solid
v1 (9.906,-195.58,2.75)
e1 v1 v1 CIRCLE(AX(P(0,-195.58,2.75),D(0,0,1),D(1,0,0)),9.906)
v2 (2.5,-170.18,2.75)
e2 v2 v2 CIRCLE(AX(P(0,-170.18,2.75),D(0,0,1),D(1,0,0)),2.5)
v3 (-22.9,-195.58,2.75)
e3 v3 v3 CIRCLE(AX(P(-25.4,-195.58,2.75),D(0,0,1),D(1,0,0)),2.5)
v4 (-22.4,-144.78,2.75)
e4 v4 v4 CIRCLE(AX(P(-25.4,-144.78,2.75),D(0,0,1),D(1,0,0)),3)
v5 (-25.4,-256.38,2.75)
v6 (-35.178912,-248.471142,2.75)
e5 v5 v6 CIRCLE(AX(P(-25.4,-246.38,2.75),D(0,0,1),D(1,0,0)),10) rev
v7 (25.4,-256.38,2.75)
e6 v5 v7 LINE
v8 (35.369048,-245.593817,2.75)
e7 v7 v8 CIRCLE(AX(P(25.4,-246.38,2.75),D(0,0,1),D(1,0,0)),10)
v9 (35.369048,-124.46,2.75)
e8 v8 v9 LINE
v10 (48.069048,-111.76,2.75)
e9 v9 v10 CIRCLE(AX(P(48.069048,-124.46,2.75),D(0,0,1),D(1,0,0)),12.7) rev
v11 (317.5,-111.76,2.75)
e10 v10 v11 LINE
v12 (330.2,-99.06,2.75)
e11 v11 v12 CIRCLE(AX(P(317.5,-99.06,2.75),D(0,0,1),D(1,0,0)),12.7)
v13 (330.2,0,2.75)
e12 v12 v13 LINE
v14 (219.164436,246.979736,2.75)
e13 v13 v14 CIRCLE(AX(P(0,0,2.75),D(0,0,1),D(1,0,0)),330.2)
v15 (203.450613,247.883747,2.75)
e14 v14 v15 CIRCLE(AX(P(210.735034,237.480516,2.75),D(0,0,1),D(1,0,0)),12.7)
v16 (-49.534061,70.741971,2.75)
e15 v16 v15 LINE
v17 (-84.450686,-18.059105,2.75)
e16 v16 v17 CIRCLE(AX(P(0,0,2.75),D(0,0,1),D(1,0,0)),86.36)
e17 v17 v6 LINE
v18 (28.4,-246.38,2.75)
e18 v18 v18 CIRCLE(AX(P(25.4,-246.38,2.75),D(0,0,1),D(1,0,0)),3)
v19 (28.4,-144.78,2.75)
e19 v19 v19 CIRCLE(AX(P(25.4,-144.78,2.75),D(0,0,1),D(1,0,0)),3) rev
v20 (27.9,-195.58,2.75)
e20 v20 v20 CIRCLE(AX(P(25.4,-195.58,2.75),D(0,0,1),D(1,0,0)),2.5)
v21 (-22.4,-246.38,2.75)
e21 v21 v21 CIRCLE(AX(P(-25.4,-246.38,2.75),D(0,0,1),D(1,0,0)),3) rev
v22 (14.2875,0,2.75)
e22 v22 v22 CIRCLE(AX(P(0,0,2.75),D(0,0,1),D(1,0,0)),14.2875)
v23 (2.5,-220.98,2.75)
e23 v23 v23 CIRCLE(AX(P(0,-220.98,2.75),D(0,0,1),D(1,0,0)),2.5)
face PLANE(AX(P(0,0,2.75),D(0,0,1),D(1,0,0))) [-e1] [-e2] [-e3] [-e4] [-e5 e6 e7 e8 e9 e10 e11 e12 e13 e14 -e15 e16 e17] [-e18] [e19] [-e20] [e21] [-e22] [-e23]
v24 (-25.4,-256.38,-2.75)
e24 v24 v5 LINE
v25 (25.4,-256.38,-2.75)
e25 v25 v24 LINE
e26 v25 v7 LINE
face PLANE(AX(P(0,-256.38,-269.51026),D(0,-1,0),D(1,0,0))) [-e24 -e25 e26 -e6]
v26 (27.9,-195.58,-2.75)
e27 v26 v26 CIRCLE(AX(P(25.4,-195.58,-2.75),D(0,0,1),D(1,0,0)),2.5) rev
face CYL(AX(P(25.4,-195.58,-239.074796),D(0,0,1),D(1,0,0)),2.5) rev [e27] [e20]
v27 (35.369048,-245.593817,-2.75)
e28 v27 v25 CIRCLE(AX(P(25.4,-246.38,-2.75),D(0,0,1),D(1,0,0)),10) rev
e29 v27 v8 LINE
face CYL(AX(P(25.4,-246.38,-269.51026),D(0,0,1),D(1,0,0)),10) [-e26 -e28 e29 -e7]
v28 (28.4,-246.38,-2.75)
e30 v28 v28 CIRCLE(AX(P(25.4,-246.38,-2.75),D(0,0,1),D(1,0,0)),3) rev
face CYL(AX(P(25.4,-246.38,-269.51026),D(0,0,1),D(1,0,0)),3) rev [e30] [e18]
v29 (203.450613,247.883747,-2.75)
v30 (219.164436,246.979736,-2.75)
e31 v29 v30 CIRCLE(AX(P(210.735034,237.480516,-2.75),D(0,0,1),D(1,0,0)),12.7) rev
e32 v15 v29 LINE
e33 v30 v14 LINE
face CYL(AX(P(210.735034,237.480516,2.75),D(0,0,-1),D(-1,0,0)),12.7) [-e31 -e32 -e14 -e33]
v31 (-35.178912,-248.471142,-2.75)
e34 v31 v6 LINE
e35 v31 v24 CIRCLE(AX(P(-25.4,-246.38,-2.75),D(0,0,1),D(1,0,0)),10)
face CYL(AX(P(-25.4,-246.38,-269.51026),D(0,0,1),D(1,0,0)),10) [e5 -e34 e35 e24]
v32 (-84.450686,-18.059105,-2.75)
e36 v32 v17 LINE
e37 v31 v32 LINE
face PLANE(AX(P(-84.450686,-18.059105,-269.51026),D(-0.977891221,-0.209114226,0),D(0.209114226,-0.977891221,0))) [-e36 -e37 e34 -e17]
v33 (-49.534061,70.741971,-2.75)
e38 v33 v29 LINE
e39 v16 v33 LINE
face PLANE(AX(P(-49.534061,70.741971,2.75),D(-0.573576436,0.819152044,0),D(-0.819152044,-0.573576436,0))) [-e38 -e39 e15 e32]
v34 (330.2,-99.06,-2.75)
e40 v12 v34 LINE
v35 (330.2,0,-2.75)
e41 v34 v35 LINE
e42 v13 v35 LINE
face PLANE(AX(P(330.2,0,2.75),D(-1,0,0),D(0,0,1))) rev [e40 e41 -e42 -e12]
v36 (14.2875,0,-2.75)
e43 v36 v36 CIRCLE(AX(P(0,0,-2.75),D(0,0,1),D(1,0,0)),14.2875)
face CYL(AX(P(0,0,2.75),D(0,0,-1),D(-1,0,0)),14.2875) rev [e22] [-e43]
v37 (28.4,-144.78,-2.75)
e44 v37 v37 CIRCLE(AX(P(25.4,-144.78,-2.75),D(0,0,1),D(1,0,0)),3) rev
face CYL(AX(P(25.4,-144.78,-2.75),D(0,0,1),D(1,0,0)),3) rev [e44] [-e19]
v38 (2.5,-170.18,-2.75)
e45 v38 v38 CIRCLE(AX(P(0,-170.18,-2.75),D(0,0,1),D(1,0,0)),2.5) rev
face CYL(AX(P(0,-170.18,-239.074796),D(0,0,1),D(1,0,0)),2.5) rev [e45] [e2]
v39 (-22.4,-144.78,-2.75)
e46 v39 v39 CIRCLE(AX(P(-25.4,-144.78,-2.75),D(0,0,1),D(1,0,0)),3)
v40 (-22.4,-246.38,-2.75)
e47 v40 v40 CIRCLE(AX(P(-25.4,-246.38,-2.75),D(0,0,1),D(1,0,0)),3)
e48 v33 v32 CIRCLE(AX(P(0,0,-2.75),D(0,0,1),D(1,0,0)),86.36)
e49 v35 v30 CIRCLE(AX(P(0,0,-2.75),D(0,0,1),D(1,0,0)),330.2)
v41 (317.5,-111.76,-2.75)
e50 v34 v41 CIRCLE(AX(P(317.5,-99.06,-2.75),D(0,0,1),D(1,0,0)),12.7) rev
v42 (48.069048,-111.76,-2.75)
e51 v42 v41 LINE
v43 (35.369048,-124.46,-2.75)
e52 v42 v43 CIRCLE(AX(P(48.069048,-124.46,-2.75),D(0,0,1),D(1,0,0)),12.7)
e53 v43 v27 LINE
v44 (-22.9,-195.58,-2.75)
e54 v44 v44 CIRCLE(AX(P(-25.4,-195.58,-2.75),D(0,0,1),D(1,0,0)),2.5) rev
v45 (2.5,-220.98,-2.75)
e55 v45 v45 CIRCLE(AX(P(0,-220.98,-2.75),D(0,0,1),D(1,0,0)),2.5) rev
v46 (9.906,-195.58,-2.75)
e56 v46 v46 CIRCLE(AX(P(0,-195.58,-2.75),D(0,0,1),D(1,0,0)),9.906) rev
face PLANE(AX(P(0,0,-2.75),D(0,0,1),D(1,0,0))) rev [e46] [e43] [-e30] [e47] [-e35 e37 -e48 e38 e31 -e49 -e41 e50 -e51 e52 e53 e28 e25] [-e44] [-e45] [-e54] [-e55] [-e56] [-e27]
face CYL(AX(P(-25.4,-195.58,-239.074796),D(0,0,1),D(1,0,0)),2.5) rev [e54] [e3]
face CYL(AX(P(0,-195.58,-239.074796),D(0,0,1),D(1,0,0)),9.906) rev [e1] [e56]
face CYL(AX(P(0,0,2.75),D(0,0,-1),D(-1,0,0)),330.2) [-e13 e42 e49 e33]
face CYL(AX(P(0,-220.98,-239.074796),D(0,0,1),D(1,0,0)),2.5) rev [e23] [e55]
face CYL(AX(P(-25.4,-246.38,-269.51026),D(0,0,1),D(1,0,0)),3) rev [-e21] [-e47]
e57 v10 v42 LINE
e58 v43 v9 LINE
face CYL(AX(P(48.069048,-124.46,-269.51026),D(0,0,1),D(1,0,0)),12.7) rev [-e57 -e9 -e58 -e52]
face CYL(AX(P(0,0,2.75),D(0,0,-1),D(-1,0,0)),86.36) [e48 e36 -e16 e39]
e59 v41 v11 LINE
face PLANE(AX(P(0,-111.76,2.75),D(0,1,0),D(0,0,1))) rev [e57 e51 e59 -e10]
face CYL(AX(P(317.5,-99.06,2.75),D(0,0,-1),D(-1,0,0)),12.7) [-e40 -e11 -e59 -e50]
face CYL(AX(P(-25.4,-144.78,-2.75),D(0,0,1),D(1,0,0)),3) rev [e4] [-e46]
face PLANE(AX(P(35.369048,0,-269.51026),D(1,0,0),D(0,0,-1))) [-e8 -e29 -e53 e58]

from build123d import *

# Parameters (mm, degrees)
SKETCH1_R               = 86.36
SKETCH1_R_2             = 14.2875
BOSS_EXTRUDE1_DEPTH     = 2.75
SKETCH2_R               = 33.4
SKETCH2_R_2             = 9.906
SKETCH2_R_3             = 2.5
BOSS_EXTRUDE2_DEPTH     = 5.5
FILLET2_R               = 12.7
SKETCH4_R               = 3
BOSS_EXTRUDE3_DEPTH     = 5.5
CUT_EXTRUDE1_DEPTH      = 419.082521041
CUT_EXTRUDE1_DEPTH_BACK = 419.082521041
SKETCH4_3_R             = 3
FILLET3_R               = 12.7


with BuildPart() as part:
    # Sketch1 → Boss-Extrude1 (new, symmetric)
    # profile 1 of 3: a face of its own
    with BuildSketch(Plane.XY):
        Circle(SKETCH1_R)
        Circle(SKETCH1_R_2, mode=Mode.SUBTRACT)
    # profile 2 of 3: a face of its own
    with BuildSketch(Plane.XY):
        with BuildLine():
            Line((0, -86.36), (0, -111.76))
            Line((0, -111.76), (310.711670846, -111.76))
            ThreePointArc((310.711670846, -111.76), (325.291433728, -56.723215206), (330.2, 0))
            ThreePointArc((330.2, 0), (299.066021409, 139.96983546), (211.535222055, 253.544650565))
            Line((211.535222055, 253.544650565), (-49.534061043, 70.741970545))
            ThreePointArc((-49.534061043, 70.741970545), (39.876610239, 76.602255553), (86.36, 0))
            ThreePointArc((86.36, 0), (61.065741623, -61.065741623), (0, -86.36))
        make_face()
    # profile 3 of 3: a face of its own
    with BuildSketch(Plane.XY):
        with BuildLine():
            ThreePointArc((330.2, 0), (325.291433728, -56.723215206), (310.711670846, -111.76))
            Line((310.711670846, -111.76), (330.2, -111.76))
            Line((330.2, -111.76), (330.2, 0))
        make_face()
    extrude(amount=BOSS_EXTRUDE1_DEPTH, both=True)

    # Sketch2 → Boss-Extrude2 (add)
    # profile 1 of 2: a face of its own
    with BuildSketch(Plane.XY.offset(2.75)):
        with BuildLine():
            ThreePointArc((-32.152177301, -204.624196748), (-4.564935824, -162.493426274), (33.4, -195.58))
            Line((33.4, -195.58), (33.4, -111.76))
            Line((33.4, -111.76), (0, -111.76))
            Line((0, -111.76), (0, -86.36))
            ThreePointArc((0, -86.36), (-52.146556012, -68.838842931), (-83.133593763, -23.384935065))
            Line((-83.133593763, -23.384935065), (-32.152177301, -204.624196748))
        make_face()
    # profile 2 of 2: a face of its own
    with BuildSketch(Plane.XY.offset(2.75)):
        with Locations((0, -195.58)):
            Circle(SKETCH2_R)
        with Locations((0, -195.58)):
            Circle(SKETCH2_R_2, mode=Mode.SUBTRACT)
        with Locations((0, -170.18)):
            Circle(SKETCH2_R_3, mode=Mode.SUBTRACT)
        with Locations((25.4, -195.58)):
            Circle(SKETCH2_R_3, mode=Mode.SUBTRACT)
        with Locations((0, -220.98)):
            Circle(SKETCH2_R_3, mode=Mode.SUBTRACT)
        with Locations((-25.4, -195.58)):
            Circle(SKETCH2_R_3, mode=Mode.SUBTRACT)
    extrude(amount=-BOSS_EXTRUDE2_DEPTH)

    # Fillet2
    fillet2_edges = [part.edges().sort_by_distance(p)[0] for p in [
        (211.535222055, 253.544650565, 0),
        (330.2, -111.76, 0),
        (33.4, -111.76, 0),
    ]]
    fillet(fillet2_edges, radius=FILLET2_R)

    # Sketch4 → Boss-Extrude3 (add)
    with BuildSketch(Plane.XY.offset(2.75)):
        with BuildLine():
            ThreePointArc((-83.133593763, -23.384935065), (-83.834442875, -20.732481468), (-84.450685864, -18.05910455))
            Line((-84.450685864, -18.05910455), (-35.178912212, -248.471142259))
            ThreePointArc((-35.178912212, -248.471142259), (-31.688424978, -254.155327086), (-25.4, -256.38))
            Line((-25.4, -256.38), (25.4, -256.38))
            ThreePointArc((25.4, -256.38), (32.743767081, -253.16742109), (35.369047914, -245.593817011))
            Line((35.369047914, -245.593817011), (35.369047914, -117.66760224))
            ThreePointArc((35.369047914, -117.66760224), (33.902190945, -120.923977623), (33.4, -124.46))
            Line((33.4, -124.46), (33.4, -195.58))
            ThreePointArc((33.4, -195.58), (4.564935824, -228.666573726), (-32.152177301, -204.624196748))
            Line((-32.152177301, -204.624196748), (-83.133593763, -23.384935065))
        make_face()
        with Locations((-25.4, -246.38)):
            Circle(SKETCH4_R, mode=Mode.SUBTRACT)
        with Locations((25.4, -246.38)):
            Circle(SKETCH4_R, mode=Mode.SUBTRACT)
    extrude(amount=-BOSS_EXTRUDE3_DEPTH)

    # Sketch4<3> → Cut-Extrude1 (cut, two sides: drawn at the far end of the back side and taken through both)
    with BuildSketch(Plane.XY.offset(2.75).offset(-CUT_EXTRUDE1_DEPTH_BACK)):
        with Locations((-25.4, -144.78)):
            Circle(SKETCH4_3_R)
        with Locations((25.4, -144.78)):
            Circle(SKETCH4_3_R)
    extrude(amount=CUT_EXTRUDE1_DEPTH + CUT_EXTRUDE1_DEPTH_BACK, mode=Mode.SUBTRACT)

    # Fillet3
    # the kernel refuses this fillet: 12.7 mm, written as the material it adds along each edge
    with BuildSketch(Plane(origin=(35.369047914, -117.66760224, 2.75), x_dir=(0.9067040347764744, 0.4217674635626387, 0), z_dir=(0, 0, -1))) as fillet3_piece_1:
        with BuildLine():
            CenterArc((8.650328867, 11.515141242), FILLET3_R, 204.946225236, 90)
            Line((-2.864812375, 6.158694454), (-4.016326499, 5.623049776))
            Line((-4.016326499, 5.623049776), (-1.151514124, -0.535644679))
            Line((-1.151514124, -0.535644679), (-0.686498518, -1.06846609))
            ThreePointArc((-0.686498518, -1.06846609), (12.757076645, -1.981994468), (14.542420333, -1.151514124))
            Line((14.542420333, -1.151514124), (14.006775654, 0))
        make_face()
    extrude(amount=5.5)


solid = part.part
